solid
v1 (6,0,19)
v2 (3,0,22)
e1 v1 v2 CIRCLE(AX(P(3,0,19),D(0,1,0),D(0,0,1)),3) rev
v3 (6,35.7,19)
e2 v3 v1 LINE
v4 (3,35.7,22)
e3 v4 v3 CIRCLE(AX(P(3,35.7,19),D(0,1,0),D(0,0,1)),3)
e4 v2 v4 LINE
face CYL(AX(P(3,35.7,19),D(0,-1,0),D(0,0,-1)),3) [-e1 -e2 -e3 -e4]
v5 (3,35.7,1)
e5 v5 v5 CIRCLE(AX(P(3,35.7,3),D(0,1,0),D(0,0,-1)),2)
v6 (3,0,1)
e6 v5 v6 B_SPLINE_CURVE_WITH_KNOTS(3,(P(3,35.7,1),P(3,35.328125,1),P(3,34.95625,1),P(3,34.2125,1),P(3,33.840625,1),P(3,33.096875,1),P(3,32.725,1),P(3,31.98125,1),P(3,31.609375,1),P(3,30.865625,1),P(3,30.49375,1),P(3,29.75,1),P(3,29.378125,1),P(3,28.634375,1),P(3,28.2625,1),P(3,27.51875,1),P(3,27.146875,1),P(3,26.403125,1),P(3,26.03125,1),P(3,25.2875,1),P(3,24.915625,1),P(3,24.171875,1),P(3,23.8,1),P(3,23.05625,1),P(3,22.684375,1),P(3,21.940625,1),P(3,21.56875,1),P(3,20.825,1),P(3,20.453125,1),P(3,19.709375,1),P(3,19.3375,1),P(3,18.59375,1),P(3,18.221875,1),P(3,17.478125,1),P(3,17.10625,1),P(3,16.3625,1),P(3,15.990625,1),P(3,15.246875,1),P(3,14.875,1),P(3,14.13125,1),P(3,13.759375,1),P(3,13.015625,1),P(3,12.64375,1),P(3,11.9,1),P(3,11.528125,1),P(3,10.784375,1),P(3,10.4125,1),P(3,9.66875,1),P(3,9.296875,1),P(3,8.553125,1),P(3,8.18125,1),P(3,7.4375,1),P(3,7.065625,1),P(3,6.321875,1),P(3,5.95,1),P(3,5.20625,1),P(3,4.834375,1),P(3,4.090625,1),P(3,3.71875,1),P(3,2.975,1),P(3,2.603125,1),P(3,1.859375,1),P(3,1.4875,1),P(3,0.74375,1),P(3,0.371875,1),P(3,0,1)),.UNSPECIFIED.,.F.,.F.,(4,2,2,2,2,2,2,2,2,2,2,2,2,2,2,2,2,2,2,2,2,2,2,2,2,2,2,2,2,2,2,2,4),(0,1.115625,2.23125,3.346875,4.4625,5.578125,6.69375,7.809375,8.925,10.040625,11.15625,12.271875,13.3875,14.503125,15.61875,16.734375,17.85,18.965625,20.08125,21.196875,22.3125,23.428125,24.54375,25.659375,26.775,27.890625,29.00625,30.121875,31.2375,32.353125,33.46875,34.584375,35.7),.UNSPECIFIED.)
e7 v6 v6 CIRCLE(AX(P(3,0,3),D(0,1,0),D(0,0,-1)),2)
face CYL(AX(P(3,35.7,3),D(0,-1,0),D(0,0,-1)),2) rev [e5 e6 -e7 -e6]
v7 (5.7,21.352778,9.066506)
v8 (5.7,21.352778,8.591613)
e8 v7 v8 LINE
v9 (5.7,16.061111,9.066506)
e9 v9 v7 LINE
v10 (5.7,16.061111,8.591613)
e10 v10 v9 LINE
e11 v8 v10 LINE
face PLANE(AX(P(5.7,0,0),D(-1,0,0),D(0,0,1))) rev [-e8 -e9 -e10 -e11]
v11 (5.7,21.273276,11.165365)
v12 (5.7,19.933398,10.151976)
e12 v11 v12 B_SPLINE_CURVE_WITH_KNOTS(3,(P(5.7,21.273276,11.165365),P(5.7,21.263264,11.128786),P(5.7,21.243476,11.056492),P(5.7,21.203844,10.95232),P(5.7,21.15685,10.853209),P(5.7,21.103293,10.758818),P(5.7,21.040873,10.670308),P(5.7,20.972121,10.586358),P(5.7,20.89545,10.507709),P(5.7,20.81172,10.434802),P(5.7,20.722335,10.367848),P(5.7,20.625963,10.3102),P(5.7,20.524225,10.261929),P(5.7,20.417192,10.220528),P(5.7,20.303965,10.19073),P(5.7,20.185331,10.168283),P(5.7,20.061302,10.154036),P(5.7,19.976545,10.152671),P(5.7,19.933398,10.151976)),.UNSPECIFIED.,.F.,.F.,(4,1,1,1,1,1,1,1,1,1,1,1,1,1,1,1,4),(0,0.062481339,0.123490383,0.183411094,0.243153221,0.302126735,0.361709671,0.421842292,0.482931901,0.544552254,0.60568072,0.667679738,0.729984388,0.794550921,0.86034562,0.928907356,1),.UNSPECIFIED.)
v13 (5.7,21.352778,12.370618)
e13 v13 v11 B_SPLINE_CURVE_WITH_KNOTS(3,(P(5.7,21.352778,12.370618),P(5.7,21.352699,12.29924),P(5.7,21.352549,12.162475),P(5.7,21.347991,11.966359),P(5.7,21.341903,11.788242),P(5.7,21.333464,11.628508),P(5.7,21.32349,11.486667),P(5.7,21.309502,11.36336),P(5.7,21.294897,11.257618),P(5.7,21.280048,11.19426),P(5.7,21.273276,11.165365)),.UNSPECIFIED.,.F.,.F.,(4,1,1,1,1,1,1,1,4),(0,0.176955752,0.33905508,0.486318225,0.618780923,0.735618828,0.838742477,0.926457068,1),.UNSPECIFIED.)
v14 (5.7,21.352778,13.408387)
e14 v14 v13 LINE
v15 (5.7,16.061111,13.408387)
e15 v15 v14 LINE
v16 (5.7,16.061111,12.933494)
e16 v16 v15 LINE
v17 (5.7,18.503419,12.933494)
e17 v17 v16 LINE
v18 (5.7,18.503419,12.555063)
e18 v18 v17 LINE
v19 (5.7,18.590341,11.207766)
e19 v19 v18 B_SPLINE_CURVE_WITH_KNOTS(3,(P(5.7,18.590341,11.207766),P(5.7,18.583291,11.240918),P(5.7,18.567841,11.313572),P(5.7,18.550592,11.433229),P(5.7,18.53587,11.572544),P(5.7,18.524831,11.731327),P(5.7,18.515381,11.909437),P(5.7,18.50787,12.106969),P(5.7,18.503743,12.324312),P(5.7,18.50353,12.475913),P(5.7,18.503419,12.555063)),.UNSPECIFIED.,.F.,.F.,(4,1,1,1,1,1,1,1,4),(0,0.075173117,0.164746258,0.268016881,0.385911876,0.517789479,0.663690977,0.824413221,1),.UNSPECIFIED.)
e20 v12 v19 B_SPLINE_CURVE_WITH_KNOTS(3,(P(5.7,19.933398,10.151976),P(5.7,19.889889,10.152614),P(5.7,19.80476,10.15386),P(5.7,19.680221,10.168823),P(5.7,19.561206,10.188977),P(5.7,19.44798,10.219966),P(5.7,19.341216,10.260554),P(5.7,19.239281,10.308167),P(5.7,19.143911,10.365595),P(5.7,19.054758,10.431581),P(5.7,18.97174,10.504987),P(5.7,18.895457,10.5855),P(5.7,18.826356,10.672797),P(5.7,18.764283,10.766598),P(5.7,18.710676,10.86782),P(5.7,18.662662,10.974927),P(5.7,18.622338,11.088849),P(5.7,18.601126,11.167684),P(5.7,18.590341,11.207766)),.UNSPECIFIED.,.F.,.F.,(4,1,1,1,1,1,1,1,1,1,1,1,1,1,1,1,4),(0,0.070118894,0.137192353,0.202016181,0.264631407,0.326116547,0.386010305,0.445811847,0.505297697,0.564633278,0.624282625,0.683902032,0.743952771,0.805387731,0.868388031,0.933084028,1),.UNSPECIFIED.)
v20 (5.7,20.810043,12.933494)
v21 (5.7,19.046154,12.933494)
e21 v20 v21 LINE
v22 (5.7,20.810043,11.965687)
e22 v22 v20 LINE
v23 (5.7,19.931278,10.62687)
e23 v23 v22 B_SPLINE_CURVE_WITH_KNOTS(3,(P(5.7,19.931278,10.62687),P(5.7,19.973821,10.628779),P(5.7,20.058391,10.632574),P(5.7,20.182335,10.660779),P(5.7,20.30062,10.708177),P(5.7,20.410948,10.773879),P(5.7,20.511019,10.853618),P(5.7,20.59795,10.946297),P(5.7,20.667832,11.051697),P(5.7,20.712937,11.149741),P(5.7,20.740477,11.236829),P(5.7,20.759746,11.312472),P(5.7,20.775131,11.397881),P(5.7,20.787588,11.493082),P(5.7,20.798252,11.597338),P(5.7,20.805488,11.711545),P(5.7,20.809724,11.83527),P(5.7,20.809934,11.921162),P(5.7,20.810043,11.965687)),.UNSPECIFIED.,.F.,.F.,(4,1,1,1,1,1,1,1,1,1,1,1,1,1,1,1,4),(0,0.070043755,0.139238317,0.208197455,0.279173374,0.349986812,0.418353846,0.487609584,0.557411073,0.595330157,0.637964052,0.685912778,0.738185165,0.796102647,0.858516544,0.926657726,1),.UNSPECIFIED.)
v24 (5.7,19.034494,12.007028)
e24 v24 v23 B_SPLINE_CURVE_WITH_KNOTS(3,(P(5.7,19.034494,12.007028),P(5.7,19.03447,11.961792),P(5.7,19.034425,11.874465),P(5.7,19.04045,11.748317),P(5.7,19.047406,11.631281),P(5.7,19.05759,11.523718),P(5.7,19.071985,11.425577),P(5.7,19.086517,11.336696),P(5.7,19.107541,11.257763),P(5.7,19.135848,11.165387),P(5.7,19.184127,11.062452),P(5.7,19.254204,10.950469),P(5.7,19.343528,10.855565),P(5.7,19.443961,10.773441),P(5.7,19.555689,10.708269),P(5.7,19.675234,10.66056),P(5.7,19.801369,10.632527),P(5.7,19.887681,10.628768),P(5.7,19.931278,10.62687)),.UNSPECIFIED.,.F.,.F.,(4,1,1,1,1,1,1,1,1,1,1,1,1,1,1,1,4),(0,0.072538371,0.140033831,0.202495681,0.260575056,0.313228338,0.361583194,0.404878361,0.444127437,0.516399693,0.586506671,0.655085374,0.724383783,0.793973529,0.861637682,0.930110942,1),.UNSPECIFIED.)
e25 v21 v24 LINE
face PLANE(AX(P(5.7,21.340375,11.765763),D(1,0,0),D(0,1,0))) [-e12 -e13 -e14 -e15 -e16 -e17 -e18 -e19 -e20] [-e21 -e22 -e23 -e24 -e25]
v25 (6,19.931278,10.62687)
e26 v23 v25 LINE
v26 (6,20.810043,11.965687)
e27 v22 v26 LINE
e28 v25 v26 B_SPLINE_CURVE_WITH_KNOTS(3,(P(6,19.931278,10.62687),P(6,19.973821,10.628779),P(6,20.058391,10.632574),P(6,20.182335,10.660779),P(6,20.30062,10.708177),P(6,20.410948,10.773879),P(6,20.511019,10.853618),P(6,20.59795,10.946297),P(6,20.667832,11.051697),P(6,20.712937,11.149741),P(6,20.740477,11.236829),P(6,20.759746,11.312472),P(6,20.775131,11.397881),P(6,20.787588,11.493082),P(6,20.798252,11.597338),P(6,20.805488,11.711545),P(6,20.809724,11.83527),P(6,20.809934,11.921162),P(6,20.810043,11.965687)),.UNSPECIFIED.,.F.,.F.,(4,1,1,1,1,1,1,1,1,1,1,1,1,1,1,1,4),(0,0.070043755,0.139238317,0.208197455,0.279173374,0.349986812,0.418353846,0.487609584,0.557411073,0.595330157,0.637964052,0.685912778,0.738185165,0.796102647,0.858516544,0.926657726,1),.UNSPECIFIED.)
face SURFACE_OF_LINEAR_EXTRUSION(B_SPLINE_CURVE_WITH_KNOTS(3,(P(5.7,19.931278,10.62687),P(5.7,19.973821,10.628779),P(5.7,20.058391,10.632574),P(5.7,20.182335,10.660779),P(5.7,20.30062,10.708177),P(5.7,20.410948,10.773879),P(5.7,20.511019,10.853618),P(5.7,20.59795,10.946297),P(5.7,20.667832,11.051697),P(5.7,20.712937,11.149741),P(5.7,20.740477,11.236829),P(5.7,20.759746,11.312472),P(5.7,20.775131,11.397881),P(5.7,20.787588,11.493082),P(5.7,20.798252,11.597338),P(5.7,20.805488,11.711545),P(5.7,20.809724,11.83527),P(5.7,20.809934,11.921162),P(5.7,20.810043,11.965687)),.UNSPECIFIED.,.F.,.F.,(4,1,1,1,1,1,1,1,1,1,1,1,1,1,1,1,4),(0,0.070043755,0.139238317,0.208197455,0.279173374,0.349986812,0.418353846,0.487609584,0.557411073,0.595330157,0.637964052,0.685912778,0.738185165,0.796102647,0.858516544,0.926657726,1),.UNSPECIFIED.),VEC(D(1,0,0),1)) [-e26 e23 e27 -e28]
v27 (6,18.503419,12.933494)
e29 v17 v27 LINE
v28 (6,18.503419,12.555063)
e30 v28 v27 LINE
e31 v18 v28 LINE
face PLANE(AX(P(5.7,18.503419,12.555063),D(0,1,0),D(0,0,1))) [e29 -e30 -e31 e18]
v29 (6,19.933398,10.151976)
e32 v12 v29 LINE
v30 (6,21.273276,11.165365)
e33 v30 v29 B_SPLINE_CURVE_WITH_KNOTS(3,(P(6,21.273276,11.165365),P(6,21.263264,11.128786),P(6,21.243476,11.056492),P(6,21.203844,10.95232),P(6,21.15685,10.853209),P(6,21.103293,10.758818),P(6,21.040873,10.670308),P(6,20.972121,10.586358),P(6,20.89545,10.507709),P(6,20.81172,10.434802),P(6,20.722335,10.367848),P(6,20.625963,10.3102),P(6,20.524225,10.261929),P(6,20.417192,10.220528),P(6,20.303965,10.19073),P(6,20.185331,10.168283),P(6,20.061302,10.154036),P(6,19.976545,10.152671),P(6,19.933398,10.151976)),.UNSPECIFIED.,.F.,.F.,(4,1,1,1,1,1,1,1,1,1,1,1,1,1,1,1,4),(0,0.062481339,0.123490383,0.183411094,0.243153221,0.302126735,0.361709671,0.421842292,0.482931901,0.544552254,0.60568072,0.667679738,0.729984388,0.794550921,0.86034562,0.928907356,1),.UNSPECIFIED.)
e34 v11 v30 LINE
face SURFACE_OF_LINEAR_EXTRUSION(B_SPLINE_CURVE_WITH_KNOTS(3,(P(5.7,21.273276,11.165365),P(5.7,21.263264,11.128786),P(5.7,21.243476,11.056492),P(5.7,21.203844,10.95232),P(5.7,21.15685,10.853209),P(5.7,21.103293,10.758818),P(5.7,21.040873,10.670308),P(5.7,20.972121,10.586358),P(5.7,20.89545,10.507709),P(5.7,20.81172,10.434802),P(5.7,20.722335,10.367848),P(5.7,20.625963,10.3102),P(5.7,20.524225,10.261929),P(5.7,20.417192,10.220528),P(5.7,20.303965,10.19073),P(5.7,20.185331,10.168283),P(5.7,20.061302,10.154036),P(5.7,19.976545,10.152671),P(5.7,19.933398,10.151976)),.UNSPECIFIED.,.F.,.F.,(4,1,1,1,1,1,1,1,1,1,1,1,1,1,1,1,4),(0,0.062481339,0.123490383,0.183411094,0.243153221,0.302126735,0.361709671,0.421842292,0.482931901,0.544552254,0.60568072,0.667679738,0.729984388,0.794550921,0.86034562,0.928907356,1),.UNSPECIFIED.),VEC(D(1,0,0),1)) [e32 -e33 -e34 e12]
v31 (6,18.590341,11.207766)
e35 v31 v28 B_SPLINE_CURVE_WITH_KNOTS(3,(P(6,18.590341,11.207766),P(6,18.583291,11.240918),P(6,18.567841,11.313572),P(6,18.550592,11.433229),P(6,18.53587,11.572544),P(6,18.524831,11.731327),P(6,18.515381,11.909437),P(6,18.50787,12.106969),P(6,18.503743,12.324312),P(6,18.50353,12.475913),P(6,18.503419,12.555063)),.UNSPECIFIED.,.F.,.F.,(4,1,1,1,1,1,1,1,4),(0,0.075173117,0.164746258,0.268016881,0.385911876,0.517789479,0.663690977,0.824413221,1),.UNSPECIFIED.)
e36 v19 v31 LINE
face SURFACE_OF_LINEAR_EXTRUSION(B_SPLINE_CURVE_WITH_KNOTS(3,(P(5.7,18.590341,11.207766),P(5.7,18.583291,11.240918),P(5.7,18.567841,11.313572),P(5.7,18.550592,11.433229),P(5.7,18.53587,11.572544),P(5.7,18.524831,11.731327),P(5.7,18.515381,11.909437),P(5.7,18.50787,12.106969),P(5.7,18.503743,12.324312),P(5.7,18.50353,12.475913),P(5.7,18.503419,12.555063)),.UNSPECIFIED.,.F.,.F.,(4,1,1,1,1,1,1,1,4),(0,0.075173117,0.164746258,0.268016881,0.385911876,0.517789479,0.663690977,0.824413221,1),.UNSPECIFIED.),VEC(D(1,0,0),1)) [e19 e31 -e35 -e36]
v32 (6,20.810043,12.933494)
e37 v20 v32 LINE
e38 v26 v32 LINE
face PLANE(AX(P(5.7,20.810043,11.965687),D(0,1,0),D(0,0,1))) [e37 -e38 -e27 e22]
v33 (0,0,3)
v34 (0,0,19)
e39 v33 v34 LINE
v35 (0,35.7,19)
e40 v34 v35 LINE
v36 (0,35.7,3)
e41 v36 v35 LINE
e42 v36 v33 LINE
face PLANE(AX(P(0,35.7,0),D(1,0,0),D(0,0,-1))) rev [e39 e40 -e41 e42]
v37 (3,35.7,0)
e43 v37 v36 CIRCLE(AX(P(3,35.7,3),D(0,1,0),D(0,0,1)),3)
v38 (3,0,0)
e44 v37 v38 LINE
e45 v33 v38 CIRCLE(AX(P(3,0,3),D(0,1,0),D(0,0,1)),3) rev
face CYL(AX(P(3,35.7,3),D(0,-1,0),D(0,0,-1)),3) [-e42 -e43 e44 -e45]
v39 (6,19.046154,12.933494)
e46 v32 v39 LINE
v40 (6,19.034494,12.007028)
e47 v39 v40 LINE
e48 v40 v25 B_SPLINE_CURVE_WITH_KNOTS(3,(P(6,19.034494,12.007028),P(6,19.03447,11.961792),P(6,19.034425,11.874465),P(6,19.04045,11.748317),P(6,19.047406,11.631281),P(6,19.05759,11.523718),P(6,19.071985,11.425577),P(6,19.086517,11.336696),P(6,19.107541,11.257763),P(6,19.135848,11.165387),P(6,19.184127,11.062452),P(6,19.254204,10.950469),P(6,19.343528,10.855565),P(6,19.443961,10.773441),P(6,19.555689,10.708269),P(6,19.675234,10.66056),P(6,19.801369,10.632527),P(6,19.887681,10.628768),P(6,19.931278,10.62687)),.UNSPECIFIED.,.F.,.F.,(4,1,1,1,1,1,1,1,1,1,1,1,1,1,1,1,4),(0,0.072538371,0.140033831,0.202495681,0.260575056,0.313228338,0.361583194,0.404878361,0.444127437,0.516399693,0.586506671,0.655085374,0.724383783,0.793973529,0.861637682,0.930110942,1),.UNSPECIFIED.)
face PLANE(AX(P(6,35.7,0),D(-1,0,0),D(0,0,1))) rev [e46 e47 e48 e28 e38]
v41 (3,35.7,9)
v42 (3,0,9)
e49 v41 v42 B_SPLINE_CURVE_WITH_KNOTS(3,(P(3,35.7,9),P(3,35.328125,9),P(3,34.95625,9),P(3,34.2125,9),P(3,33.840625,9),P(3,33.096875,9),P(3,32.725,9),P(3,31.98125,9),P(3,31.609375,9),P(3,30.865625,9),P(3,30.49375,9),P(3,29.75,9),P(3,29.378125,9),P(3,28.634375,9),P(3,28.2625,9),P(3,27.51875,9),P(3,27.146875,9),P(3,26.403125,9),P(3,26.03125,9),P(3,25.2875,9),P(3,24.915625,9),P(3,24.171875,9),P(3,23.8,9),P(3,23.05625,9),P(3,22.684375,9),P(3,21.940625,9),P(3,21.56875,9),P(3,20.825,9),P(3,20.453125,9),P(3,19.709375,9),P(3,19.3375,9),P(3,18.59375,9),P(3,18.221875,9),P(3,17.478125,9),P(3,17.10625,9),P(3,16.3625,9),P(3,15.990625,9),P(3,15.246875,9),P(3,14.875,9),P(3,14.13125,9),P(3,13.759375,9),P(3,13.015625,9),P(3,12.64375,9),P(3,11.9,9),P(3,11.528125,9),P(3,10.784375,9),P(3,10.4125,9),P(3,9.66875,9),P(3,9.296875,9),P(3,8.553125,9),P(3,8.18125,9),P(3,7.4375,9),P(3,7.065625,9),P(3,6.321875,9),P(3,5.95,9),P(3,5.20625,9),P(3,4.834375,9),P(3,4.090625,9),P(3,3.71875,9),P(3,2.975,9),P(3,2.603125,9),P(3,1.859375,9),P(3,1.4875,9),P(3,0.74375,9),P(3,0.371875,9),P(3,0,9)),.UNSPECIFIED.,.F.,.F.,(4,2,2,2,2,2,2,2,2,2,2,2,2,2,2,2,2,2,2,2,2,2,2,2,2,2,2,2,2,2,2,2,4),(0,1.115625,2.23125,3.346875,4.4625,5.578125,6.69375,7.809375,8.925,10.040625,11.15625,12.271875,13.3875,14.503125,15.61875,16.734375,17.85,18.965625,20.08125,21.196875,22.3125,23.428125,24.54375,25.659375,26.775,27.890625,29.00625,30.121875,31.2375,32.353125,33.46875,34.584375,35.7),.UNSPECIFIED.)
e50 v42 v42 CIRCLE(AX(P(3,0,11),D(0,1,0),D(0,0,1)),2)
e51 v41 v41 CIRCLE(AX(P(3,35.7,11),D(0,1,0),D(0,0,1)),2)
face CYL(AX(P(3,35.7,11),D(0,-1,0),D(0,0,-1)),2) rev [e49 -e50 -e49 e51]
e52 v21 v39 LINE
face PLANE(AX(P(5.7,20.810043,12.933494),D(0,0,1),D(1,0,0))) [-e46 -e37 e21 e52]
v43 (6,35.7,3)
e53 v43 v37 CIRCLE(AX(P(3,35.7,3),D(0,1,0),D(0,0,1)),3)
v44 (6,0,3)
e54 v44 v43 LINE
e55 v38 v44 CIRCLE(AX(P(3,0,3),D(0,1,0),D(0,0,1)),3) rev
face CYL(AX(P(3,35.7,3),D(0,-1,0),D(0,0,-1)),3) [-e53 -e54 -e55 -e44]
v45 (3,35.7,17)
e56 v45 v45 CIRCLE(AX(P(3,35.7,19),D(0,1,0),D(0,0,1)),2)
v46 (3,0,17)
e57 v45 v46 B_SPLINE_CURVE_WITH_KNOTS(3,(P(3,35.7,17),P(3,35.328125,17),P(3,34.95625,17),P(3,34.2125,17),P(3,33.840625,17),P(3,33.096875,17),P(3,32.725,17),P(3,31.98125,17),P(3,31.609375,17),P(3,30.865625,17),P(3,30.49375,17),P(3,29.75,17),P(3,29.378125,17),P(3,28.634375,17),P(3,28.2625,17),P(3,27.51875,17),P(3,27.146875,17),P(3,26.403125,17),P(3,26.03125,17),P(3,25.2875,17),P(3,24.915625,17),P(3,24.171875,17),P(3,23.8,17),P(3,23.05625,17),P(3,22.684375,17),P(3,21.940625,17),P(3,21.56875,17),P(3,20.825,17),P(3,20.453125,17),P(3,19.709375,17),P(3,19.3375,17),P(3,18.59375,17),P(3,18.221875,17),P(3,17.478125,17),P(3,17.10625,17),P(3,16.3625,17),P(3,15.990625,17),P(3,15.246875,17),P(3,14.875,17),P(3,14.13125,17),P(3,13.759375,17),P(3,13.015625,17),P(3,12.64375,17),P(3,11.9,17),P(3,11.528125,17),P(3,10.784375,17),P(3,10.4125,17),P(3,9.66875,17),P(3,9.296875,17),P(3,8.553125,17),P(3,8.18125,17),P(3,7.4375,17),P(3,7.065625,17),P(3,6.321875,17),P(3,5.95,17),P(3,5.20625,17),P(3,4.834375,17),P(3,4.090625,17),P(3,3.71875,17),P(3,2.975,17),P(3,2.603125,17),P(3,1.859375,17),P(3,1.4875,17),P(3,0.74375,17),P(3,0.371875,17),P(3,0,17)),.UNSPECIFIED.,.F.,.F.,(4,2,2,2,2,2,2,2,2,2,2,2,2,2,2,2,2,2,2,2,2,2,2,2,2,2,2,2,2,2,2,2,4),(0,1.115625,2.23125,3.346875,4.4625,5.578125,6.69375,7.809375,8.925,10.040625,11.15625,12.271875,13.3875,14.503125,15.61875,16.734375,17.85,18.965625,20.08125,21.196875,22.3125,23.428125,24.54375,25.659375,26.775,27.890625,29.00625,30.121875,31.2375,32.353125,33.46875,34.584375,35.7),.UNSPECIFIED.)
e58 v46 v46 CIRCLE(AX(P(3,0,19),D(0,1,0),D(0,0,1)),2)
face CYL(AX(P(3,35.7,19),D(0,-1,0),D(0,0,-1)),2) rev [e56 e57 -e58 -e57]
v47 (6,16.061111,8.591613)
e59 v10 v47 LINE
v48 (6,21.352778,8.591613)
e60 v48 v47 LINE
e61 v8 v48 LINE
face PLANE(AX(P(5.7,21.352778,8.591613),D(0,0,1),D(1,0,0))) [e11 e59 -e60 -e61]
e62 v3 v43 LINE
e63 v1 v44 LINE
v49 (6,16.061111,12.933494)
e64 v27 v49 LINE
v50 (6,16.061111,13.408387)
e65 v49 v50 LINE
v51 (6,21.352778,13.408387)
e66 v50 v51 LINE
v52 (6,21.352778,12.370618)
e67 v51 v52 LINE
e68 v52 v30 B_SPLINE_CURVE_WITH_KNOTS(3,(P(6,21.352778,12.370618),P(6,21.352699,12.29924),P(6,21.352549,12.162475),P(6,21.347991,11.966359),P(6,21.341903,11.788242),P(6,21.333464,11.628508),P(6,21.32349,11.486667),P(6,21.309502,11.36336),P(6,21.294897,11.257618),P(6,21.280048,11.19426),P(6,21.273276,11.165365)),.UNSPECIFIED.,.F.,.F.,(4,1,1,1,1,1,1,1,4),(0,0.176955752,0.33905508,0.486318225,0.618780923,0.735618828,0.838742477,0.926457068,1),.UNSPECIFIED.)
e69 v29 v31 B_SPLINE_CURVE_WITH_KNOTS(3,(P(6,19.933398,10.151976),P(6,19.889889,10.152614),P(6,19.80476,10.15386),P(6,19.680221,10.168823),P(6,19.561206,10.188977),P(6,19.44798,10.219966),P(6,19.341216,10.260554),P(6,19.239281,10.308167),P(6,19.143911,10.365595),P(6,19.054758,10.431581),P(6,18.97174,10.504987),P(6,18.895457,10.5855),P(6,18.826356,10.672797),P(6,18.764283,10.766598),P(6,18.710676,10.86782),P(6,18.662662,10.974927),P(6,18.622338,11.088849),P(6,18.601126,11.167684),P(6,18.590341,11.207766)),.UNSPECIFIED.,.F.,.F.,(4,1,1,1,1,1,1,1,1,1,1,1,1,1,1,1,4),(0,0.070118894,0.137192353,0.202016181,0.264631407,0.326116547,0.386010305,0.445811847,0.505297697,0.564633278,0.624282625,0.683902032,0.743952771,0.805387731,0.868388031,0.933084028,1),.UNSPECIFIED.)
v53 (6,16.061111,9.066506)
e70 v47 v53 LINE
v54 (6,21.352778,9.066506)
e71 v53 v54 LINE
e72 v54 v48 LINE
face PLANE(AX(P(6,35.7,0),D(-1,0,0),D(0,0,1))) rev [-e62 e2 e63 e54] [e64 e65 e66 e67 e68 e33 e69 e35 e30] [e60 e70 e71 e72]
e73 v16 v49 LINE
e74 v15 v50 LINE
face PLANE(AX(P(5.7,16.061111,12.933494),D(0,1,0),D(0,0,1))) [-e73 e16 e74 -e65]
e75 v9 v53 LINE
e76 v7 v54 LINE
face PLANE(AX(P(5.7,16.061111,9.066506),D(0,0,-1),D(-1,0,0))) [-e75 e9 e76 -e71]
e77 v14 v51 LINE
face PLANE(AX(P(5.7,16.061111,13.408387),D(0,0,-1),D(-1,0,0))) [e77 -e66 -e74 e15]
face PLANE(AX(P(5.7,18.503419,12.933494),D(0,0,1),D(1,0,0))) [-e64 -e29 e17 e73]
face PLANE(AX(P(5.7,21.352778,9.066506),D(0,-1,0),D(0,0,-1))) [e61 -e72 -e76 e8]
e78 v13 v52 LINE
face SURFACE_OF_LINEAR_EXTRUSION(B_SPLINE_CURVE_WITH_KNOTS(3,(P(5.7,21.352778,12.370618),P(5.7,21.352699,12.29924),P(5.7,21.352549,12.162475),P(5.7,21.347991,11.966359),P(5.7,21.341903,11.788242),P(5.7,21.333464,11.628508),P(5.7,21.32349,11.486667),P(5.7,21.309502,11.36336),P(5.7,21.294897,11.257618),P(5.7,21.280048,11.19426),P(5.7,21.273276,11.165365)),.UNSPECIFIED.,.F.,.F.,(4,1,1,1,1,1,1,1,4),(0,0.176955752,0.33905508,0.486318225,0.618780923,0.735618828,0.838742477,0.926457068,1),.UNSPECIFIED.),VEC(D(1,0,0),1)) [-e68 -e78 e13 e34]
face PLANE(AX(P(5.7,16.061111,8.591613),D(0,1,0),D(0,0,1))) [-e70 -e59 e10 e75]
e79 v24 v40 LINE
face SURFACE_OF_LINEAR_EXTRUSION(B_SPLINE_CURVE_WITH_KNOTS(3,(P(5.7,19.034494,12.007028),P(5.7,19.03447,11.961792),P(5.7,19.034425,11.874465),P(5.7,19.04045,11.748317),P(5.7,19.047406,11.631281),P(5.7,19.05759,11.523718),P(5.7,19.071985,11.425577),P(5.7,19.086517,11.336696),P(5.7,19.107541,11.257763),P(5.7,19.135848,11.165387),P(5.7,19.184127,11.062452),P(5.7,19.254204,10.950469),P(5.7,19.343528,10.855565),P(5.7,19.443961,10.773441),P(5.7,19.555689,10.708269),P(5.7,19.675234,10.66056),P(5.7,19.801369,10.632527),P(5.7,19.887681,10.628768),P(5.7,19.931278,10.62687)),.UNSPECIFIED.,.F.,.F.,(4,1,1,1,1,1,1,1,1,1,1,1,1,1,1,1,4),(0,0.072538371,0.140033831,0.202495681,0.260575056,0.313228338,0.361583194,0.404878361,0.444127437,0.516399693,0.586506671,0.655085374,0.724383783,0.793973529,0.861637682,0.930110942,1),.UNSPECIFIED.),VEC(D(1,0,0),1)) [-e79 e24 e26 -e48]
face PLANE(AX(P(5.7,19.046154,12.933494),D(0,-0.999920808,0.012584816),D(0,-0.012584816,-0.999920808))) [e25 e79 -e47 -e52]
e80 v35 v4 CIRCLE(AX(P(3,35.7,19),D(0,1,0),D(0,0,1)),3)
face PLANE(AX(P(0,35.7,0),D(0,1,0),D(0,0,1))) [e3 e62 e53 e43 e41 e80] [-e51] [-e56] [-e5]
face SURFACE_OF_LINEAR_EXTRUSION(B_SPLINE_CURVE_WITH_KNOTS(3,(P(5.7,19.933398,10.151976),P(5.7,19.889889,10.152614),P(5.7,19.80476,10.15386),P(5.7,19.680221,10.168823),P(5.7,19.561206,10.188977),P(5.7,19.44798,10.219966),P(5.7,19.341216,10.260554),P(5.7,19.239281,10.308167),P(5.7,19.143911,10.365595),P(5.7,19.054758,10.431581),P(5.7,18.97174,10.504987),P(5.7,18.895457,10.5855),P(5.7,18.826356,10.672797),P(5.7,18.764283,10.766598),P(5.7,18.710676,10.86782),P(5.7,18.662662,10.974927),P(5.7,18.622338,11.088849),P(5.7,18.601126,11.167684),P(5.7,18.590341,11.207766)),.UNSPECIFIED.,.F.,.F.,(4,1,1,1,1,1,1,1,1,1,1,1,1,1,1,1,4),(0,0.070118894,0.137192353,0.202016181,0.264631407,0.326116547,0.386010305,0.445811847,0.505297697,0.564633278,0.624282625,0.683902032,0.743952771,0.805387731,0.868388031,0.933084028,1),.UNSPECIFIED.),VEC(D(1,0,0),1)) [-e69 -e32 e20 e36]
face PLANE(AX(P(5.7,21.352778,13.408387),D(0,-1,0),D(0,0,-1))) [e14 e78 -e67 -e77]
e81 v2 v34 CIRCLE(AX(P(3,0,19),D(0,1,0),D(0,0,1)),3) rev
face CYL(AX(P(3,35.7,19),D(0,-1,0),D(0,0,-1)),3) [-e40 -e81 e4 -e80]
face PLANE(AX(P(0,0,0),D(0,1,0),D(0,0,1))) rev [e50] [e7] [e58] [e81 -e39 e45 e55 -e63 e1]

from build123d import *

# Parameters (mm, degrees)
SKETCH1_W           = 6
SKETCH1_H           = 22
SKETCH1_R           = 2
BOSS_EXTRUDE1_DEPTH = 35.7
FILLET1_R           = 3
SKETCH2_W           = 0.474893162
SKETCH2_H           = 5.291666667
CUT_EXTRUDE1_DEPTH  = 0.3


with BuildPart() as part:
    # Sketch1 → Boss-Extrude1 (new body)
    with BuildSketch(Plane(origin=(0, 0, 0), x_dir=(1, 0, 0), z_dir=(0, 1, 0))):
        with Locations((3, -11)):
            Rectangle(SKETCH1_W, SKETCH1_H)
        with Locations(Location((3, -11, 0), (0, 0, 90))):
            Circle(SKETCH1_R, mode=Mode.SUBTRACT)
        with Locations(Location((3, -19, 0), (0, 0, 90))):
            Circle(SKETCH1_R, mode=Mode.SUBTRACT)
        with Locations(Location((3, -3, 0), (0, 0, 90))):
            Circle(SKETCH1_R, mode=Mode.SUBTRACT)
    extrude(amount=BOSS_EXTRUDE1_DEPTH)

    # Fillet1
    fillet1_edges = [part.edges().sort_by_distance(p)[0] for p in [
        (0, 17.85, 0),
        (6, 17.85, 0),
        (0, 17.85, 22),
        (6, 17.85, 22),
    ]]
    fillet(fillet1_edges, radius=FILLET1_R - 0.0001)  # a hair under: the kernel refuses the full size

    # Sketch2 → Cut-Extrude1 (cut)
    # profile 1 of 2: a face of its own
    with BuildSketch(Plane(origin=(6, 0, 0), x_dir=(0, 0, -1), z_dir=(1, 0, 0))):
        with BuildLine():
            Line((-13.408386752, 21.352777778), (-12.370617989, 21.352777778))
            add(Edge.make_bspline(
                [(-12.370617989, 21.352777778), (-12.299239595, 21.352699316), (-12.162475422, 21.352548979), (-11.966358612, 21.34799097), (-11.788241518, 21.341902995), (-11.628508204, 21.333463704), (-11.486667198, 21.323490288), (-11.363360329, 21.309502086), (-11.257618381, 21.294896639), (-11.19425982, 21.280047607), (-11.165364583, 21.273275574)],
                knots=[0, 0, 0, 0, 1.415646017, 2.712440637, 3.8905458, 4.950247383, 5.884950622, 6.709939814, 7.411656543, 8, 8, 8, 8], degree=3))
            add(Edge.make_bspline(
                [(-11.165364583, 21.273275574), (-11.128786264, 21.263263817), (-11.056491549, 21.243476216), (-10.952319734, 21.203843563), (-10.853208563, 21.156850289), (-10.758817992, 21.103292666), (-10.670307938, 21.040872825), (-10.586357852, 20.972121046), (-10.507708596, 20.895449984), (-10.434802444, 20.81171958), (-10.367848048, 20.722335453), (-10.310199599, 20.625963272), (-10.261928672, 20.52422523), (-10.220527774, 20.417192092), (-10.190730468, 20.303965056), (-10.168283369, 20.18533086), (-10.154035742, 20.061302221), (-10.152671154, 19.97654504), (-10.151976496, 19.933398438)],
                knots=[0, 0, 0, 0, 0.999701418, 1.975846123, 2.934577507, 3.890451536, 4.834027766, 5.787354733, 6.749476667, 7.726910423, 8.712836071, 9.690891519, 10.682875813, 11.679750201, 12.712814741, 13.765529915, 14.8625177, 16, 16, 16, 16], degree=3))
            add(Edge.make_bspline(
                [(-10.151976496, 19.933398438), (-10.15261365, 19.88988918), (-10.153860285, 19.804760378), (-10.168822526, 19.680220568), (-10.188976506, 19.561205859), (-10.219966097, 19.447980142), (-10.260554198, 19.341215822), (-10.308167182, 19.239281341), (-10.365594663, 19.143910884), (-10.431581489, 19.054758218), (-10.504986876, 18.97173966), (-10.585500246, 18.895456816), (-10.672796558, 18.82635621), (-10.766598377, 18.764282928), (-10.867820172, 18.71067641), (-10.974926761, 18.66266239), (-11.088849112, 18.622338286), (-11.167683628, 18.601126169), (-11.207765759, 18.590341213)],
                knots=[0, 0, 0, 0, 1.121902311, 2.195077645, 3.232258892, 4.234102512, 5.217864754, 6.176164875, 7.132989551, 8.084763148, 9.034132444, 9.988522005, 10.94243251, 11.903244335, 12.886203696, 13.894208494, 14.929344452, 16, 16, 16, 16], degree=3))
            add(Edge.make_bspline(
                [(-11.207765759, 18.590341213), (-11.240917799, 18.583291229), (-11.313572424, 18.567840781), (-11.433228682, 18.550592281), (-11.57254373, 18.535869956), (-11.731327415, 18.524831331), (-11.909437212, 18.515381369), (-12.10696947, 18.507870085), (-12.324311944, 18.503742806), (-12.475912515, 18.50352994), (-12.555063101, 18.503418803)],
                knots=[0, 0, 0, 0, 0.601384939, 1.31797006, 2.144135048, 3.087295005, 4.142315834, 5.309527816, 6.595305764, 8, 8, 8, 8], degree=3))
            Line((-12.555063101, 18.503418803), (-12.93349359, 18.503418803))
            Line((-12.93349359, 18.503418803), (-12.93349359, 16.061111111))
            Line((-12.93349359, 16.061111111), (-13.408386752, 16.061111111))
            Line((-13.408386752, 16.061111111), (-13.408386752, 21.352777778))
        make_face()
        with BuildLine():
            Line((-12.93349359, 20.810042735), (-12.93349359, 19.046153846))
            Line((-12.93349359, 19.046153846), (-12.007027911, 19.034493523))
            add(Edge.make_bspline(
                [(-12.007027911, 19.034493523), (-11.961791833, 19.034470143), (-11.874464516, 19.03442501), (-11.748316893, 19.040450288), (-11.631281423, 19.047405855), (-11.523717601, 19.05758993), (-11.425576938, 19.071985165), (-11.336695793, 19.086517197), (-11.257763354, 19.107540781), (-11.165387179, 19.135848278), (-11.062451642, 19.184127352), (-10.950468563, 19.254203972), (-10.855565414, 19.343528376), (-10.773441323, 19.44396093), (-10.708269341, 19.555689376), (-10.660559686, 19.675234078), (-10.632527222, 19.801369041), (-10.628768334, 19.88768087), (-10.626869658, 19.931278379)],
                knots=[0, 0, 0, 0, 1.160613943, 2.240541288, 3.23993089, 4.169200891, 5.011653406, 5.7853311, 6.478053781, 7.106038997, 8.262395093, 9.384106736, 10.481365981, 11.59014053, 12.70357646, 13.786202915, 14.881775077, 16, 16, 16, 16], degree=3))
            add(Edge.make_bspline(
                [(-10.626869658, 19.931278379), (-10.628778659, 19.973821131), (-10.632573518, 20.058390858), (-10.660779406, 20.182334936), (-10.708176583, 20.30061987), (-10.773878815, 20.410948226), (-10.853618381, 20.511019393), (-10.946297149, 20.597949574), (-11.051696961, 20.667832386), (-11.14974131, 20.712937467), (-11.236828818, 20.740477228), (-11.312472376, 20.759746213), (-11.397880896, 20.775130761), (-11.493082182, 20.787588104), (-11.597338347, 20.798252266), (-11.711545085, 20.805488208), (-11.83526976, 20.809723743), (-11.921161933, 20.80993383), (-11.965686765, 20.810042735)],
                knots=[0, 0, 0, 0, 1.120700087, 2.227813068, 3.331159281, 4.466773991, 5.599788987, 6.693661531, 7.80175334, 8.91857717, 9.525282508, 10.207424825, 10.974604443, 11.810962634, 12.737642355, 13.736264703, 14.826523623, 16, 16, 16, 16], degree=3))
            Line((-11.965686765, 20.810042735), (-12.93349359, 20.810042735))
        make_face(mode=Mode.SUBTRACT)
    # profile 2 of 2: a face of its own
    with BuildSketch(Plane(origin=(6, 0, 0), x_dir=(0, 0, -1), z_dir=(1, 0, 0))):
        with Locations((-8.829059829, 18.706944445)):
            Rectangle(SKETCH2_W, SKETCH2_H)
    extrude(amount=-CUT_EXTRUDE1_DEPTH, mode=Mode.SUBTRACT)


solid = part.part
